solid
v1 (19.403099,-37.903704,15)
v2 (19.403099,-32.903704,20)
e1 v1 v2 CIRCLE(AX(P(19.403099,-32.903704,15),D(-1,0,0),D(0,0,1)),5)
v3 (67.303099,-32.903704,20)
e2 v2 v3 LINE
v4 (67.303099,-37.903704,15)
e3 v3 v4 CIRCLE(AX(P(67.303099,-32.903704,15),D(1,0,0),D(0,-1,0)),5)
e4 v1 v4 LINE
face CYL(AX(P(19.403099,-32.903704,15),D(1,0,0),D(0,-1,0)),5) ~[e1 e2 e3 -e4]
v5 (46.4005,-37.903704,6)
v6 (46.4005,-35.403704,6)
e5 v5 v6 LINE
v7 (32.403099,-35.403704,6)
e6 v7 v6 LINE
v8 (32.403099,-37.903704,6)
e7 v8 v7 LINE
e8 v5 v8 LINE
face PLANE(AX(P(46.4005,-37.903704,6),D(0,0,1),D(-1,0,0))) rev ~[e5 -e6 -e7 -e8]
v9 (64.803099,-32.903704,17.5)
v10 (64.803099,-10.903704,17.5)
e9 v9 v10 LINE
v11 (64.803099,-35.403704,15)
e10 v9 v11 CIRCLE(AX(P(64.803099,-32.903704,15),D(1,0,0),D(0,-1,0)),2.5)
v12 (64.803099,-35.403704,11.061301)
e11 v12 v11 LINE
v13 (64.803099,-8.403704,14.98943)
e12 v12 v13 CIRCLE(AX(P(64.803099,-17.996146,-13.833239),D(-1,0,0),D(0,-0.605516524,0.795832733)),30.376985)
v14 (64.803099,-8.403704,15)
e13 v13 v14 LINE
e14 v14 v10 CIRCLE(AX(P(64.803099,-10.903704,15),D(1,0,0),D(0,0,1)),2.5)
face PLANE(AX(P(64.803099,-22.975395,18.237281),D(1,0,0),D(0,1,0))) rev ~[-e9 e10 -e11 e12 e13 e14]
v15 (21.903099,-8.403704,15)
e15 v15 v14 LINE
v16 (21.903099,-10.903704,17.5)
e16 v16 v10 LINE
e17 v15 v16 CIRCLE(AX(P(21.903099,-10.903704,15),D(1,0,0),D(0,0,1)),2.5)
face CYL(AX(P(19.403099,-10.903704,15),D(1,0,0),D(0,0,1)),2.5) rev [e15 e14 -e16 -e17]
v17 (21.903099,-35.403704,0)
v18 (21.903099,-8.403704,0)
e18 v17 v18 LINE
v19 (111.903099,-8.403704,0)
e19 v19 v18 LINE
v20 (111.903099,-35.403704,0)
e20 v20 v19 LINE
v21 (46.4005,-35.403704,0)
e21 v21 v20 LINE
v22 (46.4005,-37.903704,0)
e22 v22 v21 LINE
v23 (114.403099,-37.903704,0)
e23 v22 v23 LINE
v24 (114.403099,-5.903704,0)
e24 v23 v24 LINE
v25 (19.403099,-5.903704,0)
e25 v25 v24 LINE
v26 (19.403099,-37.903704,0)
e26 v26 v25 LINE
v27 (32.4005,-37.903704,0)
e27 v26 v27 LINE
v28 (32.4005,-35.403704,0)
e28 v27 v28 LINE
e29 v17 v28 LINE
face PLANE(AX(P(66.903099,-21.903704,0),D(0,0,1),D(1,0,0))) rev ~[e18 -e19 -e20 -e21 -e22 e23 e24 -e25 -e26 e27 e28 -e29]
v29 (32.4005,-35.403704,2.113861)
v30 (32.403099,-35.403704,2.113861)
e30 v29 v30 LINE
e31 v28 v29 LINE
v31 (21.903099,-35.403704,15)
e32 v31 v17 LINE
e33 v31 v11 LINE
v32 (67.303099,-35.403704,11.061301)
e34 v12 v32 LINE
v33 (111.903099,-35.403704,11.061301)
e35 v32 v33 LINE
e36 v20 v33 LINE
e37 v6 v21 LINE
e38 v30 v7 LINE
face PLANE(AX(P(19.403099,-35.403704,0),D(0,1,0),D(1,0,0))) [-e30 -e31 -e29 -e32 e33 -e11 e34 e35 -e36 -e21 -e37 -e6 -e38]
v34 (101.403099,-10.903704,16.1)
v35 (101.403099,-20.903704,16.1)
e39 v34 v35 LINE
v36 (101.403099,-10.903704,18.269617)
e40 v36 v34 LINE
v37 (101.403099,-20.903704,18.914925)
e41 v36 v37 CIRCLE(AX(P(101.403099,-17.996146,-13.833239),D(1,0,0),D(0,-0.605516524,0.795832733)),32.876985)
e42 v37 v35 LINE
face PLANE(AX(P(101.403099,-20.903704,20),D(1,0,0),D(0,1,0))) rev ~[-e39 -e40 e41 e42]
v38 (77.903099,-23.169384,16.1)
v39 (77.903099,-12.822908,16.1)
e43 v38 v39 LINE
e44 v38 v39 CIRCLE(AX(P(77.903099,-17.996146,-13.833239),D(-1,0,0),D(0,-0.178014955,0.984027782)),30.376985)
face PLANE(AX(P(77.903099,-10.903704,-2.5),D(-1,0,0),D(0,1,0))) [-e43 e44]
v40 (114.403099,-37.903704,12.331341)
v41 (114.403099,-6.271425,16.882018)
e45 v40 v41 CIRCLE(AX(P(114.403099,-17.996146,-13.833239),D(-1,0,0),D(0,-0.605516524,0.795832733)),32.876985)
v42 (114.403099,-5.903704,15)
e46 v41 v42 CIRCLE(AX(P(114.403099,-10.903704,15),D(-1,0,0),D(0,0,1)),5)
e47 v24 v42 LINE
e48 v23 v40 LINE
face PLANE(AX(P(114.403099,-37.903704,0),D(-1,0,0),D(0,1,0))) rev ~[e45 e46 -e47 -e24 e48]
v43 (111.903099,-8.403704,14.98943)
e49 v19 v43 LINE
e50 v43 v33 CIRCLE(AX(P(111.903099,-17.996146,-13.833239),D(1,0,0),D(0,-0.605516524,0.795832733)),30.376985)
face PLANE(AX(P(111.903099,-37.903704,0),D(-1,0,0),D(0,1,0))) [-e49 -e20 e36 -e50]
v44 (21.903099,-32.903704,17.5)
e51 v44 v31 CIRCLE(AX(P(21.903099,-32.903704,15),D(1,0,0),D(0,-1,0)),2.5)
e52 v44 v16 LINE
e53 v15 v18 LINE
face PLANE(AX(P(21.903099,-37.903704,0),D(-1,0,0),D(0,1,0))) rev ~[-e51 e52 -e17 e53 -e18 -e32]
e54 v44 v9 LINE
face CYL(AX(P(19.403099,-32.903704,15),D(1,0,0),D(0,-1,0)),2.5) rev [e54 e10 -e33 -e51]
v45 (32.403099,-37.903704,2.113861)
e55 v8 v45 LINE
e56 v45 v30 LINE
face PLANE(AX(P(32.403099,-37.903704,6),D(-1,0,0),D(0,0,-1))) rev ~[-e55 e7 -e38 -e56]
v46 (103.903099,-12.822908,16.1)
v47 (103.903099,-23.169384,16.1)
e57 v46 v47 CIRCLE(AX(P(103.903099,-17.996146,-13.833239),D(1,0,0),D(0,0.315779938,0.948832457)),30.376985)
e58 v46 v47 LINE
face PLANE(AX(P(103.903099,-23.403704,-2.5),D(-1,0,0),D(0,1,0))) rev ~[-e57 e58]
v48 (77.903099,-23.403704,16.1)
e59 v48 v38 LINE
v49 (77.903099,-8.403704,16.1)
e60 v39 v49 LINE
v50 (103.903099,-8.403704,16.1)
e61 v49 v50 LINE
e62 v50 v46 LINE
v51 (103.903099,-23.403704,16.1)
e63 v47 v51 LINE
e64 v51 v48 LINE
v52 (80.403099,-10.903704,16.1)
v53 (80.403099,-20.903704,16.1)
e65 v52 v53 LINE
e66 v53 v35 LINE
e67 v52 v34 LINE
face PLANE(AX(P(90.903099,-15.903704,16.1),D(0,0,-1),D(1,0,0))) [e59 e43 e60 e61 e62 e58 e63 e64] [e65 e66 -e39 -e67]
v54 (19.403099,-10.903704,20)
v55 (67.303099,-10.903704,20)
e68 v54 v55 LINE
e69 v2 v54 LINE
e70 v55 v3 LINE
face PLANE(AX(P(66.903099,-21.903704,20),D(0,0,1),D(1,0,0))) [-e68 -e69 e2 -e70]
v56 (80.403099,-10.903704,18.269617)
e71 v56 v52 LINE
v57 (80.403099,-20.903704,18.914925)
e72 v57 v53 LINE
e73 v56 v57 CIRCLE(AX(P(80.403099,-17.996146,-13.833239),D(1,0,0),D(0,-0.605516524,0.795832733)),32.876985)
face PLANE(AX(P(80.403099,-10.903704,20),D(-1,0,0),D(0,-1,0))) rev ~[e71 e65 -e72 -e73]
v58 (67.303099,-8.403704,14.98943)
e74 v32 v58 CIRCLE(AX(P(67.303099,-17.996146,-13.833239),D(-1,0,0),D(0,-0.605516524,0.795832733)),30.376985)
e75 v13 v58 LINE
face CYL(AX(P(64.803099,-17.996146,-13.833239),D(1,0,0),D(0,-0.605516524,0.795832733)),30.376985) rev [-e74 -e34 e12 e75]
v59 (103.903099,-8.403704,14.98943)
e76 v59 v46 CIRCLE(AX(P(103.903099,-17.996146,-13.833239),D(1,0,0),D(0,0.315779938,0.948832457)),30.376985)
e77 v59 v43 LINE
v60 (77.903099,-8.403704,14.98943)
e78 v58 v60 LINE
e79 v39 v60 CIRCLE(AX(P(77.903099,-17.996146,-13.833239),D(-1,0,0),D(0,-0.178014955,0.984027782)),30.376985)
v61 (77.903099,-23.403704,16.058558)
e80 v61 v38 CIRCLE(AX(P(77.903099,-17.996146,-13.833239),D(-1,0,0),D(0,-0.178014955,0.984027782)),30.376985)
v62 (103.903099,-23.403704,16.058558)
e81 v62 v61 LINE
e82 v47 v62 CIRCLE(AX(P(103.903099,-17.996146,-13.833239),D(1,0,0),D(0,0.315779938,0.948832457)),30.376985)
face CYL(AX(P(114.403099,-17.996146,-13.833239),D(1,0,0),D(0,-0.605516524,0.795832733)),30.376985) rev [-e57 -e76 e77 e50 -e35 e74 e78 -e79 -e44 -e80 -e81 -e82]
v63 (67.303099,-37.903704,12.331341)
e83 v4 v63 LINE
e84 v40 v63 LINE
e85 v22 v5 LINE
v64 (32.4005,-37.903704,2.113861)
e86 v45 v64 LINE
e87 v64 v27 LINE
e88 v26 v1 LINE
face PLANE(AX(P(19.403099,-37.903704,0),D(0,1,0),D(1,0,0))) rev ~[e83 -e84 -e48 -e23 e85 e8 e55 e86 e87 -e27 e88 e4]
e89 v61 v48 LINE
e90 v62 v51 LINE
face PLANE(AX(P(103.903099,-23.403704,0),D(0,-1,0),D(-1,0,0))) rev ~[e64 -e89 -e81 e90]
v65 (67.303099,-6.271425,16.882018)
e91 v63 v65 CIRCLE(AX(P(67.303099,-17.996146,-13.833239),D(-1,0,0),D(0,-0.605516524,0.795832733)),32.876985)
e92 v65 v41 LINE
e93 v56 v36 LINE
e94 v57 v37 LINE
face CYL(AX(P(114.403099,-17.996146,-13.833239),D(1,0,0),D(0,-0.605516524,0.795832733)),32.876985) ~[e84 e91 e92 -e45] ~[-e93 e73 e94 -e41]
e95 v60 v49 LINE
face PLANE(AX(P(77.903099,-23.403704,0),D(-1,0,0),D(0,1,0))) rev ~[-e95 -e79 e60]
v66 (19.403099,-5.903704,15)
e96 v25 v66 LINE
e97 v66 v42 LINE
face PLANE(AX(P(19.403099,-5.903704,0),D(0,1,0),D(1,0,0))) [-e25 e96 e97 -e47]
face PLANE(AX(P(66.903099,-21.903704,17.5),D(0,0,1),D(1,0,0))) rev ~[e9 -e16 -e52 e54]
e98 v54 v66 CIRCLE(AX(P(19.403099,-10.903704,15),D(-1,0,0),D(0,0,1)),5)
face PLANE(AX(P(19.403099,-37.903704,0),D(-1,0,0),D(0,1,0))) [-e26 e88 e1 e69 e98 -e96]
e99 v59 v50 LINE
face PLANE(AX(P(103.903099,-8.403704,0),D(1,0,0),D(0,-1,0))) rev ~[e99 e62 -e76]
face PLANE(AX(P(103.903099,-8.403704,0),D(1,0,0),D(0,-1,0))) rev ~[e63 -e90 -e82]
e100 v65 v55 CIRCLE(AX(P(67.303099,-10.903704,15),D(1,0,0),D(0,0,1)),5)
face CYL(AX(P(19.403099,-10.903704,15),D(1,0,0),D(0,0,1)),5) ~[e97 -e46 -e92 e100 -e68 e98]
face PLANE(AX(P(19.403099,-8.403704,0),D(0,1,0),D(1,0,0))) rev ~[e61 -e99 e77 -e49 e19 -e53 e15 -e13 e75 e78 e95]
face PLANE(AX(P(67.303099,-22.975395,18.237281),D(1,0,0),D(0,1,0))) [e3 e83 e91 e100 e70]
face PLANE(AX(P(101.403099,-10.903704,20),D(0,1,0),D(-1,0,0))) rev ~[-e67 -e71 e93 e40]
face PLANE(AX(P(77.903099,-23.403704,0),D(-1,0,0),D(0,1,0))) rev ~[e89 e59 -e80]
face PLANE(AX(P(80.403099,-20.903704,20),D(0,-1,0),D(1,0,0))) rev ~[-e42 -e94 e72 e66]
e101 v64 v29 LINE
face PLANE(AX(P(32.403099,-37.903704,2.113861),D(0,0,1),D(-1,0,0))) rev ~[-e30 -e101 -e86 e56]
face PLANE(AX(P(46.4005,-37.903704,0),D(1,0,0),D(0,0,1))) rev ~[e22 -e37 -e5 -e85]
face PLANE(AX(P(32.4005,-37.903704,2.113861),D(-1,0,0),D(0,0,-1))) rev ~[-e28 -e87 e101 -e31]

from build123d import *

# Parameters (mm, degrees)
F0_W        = 95
F0_H        = 32
F1_DEPTH    = 20
F3_R        = 5
F4_R        = 5
F6_DEPTH    = 25
F7_DEPTH    = 47.1
F8_T        = 2.5
F8_T3_DEPTH = 23.9149246247
F8_T5_DEPTH = 23.2696171533
F8_T8_ANGLE = 58.1590270575
F9_W        = 21
F9_H        = 10
F10_DEPTH   = 16.1
F13_DEPTH   = 25


# Not quite as in the source:
# - a shell that OpenCascade refuses in one call is made with other operations: the cavity is built on its own and cut out


with BuildPart() as f1:
    # F0 (on Top) → F1 (new body)
    with BuildSketch(Plane.XY):
        with Locations((66.9030988216, -21.9037037492)):
            Rectangle(F0_W, F0_H)
    extrude(amount=F1_DEPTH)

    # F3
    f3_edges = [f1.edges().sort_by_distance(p)[0] for p in [
        (66.903099, -37.903704, 20),
    ]]
    fillet(f3_edges, radius=F3_R)

    # F4
    f4_edges = [f1.edges().sort_by_distance(p)[0] for p in [
        (66.903099, -5.903704, 20),
    ]]
    fillet(f4_edges, radius=F4_R)

    # F5 (on face) → F6 (cut)
    with BuildSketch(Plane.XY.offset(20)):
        Polygon((101.4030988216, -20.6582732499), (101.4030988216, -10.9037037492), (80.4030988216, -10.9037037492), (80.4030988216, -20.9037037492), (101.4030988216, -20.9037037492), align=None)
    extrude(amount=-F6_DEPTH, mode=Mode.SUBTRACT)

    # F2 (on face) → F7 (cut)
    with BuildSketch(Plane.YZ.offset(114.4030988216)):
        with BuildLine():
            ThreePointArc((-37.9037037492, 12.3313413933), (-22.4823614594, 18.7362249856), (-5.9037037492, 16.7391169816))
            Line((-5.9037037492, 16.7391169816), (-5.9037037492, 20))
            Line((-5.9037037492, 20), (-37.9037037492, 20))
            Line((-37.9037037492, 20), (-37.9037037492, 12.3313413933))
        make_face()
    extrude(amount=-F7_DEPTH, mode=Mode.SUBTRACT)

    # F8: shell of thickness 2.5, made by hand


with BuildPart() as f8_core1:
    # F8_t2: copy of F1
    add(f1.part)

    # the walls: a layer under each face that stays
    f8_faces = [f8_core1.faces().sort_by_distance(p)[0] for p in [
        (19.4030988216, -21.9037037492, 10),
        (43.3530988216, -21.9037037492, 20),
        (66.9030988216, -7.3681698432, 18.5355339059),
        (43.3530988216, -36.4392376551, 18.5355339059),
        (66.9030988216, -5.9037037492, 7.5),
        (66.9030988216, -37.9037037492, 7.5),
        (67.3030988216, -32.6316572711, 16.1656706966),
        (90.8530988216, -22.6776915616, 18.7087222914),
        (114.4030988216, -21.9037037492, 9.5218727657),
        (80.4030988216, -15.9037037492, 9.5218727657),
        (90.9030988216, -20.9037037492, 9.4574623123),
        (101.4030988216, -15.9037037492, 9.5218727657),
        (90.9030988216, -10.9037037492, 9.1348085767),
    ]]
    thicken(f8_faces, amount=-F8_T, mode=Mode.SUBTRACT)

    # F8_s4 → F8_t3 (cut)
    with BuildSketch(Plane.XY.offset(-2.5)):
        Polygon((80.4280988216, -20.8787037492), (77.9030988216, -20.9037037492), (77.9030988216, -23.4037037492), (80.4030988216, -23.4037037492), align=None)
        Polygon((101.3780988216, -20.8787037492), (101.4030988216, -23.4037037492), (103.9030988216, -23.4037037492), (103.9030988216, -20.9037037492), align=None)
    extrude(amount=F8_T3_DEPTH, mode=Mode.SUBTRACT)

    # F8_s6 → F8_t5 (cut)
    with BuildSketch(Plane.XY.offset(-2.5)):
        Polygon((80.4280988216, -10.9287037492), (77.9030988216, -10.9037037492), (77.9030988216, -8.4037037492), (80.4030988216, -8.4037037492), align=None)
        Polygon((101.3780988216, -10.9287037492), (103.9030988216, -10.9037037492), (103.9030988216, -8.4037037492), (101.4030988216, -8.4037037492), align=None)
    extrude(amount=F8_T5_DEPTH, mode=Mode.SUBTRACT)

    # F8_s7 → F8_t8 (revolve, cut)
    with BuildSketch(Plane(origin=(0, -18.0639523955, -13.7441213447), x_dir=(1, 0, 0), z_dir=(0, -0.7958327334, -0.6055165237))):
        Polygon((67.3280988216, 32.7900040558), (64.8030988216, 32.7650040558), (64.8030988216, 30.2650040558), (67.3030988216, 30.2650040558), align=None)
    revolve(axis=Axis((67.3030988216, -17.9961461515, -13.8332393562), (-1, 0, 0)), revolution_arc=F8_T8_ANGLE, mode=Mode.SUBTRACT)


with BuildPart() as f1_1:
    add(f1.part)

    # what is left inside the walls is the cavity
    f8_cavity = [f8_core1.part.solids().sort_by_distance(p)[0] for p in [
        (66.903099, -26.403704, 0.025),
    ]]
    add(f8_cavity, mode=Mode.SUBTRACT)

    # F9 (on face) → F10 (cut)
    with BuildSketch(Plane(origin=(0, 0, 0), x_dir=(1, 0, 0), z_dir=(0, 0, -1))):
        Polygon((77.9030988216, 10.9037037492), (77.9030988216, 8.4037037492), (103.9030988216, 8.4037037492), (103.9030988216, 10.9037037492), (103.9030988216, 20.9037037492), (103.9030988216, 23.4037037492), (77.9030988216, 23.4037037492), (77.9030988216, 20.9037037492), align=None)
        with Locations((90.9030988216, 15.9037037492)):
            Rectangle(F9_W, F9_H, mode=Mode.SUBTRACT)
    extrude(amount=-F10_DEPTH, mode=Mode.SUBTRACT)

    # F12 (on face) → F13 (cut)
    with BuildSketch(Plane.XZ.offset(37.9037037492)):
        Polygon((46.4005000293, 6), (32.4030988216, 6), (32.4030988216, 2.1138605662), (32.4005000293, 2.1138605662), (32.4005000293, 0), (46.4005000293, 0), align=None)
    extrude(amount=-F13_DEPTH, mode=Mode.SUBTRACT)


solid = f1_1.part
